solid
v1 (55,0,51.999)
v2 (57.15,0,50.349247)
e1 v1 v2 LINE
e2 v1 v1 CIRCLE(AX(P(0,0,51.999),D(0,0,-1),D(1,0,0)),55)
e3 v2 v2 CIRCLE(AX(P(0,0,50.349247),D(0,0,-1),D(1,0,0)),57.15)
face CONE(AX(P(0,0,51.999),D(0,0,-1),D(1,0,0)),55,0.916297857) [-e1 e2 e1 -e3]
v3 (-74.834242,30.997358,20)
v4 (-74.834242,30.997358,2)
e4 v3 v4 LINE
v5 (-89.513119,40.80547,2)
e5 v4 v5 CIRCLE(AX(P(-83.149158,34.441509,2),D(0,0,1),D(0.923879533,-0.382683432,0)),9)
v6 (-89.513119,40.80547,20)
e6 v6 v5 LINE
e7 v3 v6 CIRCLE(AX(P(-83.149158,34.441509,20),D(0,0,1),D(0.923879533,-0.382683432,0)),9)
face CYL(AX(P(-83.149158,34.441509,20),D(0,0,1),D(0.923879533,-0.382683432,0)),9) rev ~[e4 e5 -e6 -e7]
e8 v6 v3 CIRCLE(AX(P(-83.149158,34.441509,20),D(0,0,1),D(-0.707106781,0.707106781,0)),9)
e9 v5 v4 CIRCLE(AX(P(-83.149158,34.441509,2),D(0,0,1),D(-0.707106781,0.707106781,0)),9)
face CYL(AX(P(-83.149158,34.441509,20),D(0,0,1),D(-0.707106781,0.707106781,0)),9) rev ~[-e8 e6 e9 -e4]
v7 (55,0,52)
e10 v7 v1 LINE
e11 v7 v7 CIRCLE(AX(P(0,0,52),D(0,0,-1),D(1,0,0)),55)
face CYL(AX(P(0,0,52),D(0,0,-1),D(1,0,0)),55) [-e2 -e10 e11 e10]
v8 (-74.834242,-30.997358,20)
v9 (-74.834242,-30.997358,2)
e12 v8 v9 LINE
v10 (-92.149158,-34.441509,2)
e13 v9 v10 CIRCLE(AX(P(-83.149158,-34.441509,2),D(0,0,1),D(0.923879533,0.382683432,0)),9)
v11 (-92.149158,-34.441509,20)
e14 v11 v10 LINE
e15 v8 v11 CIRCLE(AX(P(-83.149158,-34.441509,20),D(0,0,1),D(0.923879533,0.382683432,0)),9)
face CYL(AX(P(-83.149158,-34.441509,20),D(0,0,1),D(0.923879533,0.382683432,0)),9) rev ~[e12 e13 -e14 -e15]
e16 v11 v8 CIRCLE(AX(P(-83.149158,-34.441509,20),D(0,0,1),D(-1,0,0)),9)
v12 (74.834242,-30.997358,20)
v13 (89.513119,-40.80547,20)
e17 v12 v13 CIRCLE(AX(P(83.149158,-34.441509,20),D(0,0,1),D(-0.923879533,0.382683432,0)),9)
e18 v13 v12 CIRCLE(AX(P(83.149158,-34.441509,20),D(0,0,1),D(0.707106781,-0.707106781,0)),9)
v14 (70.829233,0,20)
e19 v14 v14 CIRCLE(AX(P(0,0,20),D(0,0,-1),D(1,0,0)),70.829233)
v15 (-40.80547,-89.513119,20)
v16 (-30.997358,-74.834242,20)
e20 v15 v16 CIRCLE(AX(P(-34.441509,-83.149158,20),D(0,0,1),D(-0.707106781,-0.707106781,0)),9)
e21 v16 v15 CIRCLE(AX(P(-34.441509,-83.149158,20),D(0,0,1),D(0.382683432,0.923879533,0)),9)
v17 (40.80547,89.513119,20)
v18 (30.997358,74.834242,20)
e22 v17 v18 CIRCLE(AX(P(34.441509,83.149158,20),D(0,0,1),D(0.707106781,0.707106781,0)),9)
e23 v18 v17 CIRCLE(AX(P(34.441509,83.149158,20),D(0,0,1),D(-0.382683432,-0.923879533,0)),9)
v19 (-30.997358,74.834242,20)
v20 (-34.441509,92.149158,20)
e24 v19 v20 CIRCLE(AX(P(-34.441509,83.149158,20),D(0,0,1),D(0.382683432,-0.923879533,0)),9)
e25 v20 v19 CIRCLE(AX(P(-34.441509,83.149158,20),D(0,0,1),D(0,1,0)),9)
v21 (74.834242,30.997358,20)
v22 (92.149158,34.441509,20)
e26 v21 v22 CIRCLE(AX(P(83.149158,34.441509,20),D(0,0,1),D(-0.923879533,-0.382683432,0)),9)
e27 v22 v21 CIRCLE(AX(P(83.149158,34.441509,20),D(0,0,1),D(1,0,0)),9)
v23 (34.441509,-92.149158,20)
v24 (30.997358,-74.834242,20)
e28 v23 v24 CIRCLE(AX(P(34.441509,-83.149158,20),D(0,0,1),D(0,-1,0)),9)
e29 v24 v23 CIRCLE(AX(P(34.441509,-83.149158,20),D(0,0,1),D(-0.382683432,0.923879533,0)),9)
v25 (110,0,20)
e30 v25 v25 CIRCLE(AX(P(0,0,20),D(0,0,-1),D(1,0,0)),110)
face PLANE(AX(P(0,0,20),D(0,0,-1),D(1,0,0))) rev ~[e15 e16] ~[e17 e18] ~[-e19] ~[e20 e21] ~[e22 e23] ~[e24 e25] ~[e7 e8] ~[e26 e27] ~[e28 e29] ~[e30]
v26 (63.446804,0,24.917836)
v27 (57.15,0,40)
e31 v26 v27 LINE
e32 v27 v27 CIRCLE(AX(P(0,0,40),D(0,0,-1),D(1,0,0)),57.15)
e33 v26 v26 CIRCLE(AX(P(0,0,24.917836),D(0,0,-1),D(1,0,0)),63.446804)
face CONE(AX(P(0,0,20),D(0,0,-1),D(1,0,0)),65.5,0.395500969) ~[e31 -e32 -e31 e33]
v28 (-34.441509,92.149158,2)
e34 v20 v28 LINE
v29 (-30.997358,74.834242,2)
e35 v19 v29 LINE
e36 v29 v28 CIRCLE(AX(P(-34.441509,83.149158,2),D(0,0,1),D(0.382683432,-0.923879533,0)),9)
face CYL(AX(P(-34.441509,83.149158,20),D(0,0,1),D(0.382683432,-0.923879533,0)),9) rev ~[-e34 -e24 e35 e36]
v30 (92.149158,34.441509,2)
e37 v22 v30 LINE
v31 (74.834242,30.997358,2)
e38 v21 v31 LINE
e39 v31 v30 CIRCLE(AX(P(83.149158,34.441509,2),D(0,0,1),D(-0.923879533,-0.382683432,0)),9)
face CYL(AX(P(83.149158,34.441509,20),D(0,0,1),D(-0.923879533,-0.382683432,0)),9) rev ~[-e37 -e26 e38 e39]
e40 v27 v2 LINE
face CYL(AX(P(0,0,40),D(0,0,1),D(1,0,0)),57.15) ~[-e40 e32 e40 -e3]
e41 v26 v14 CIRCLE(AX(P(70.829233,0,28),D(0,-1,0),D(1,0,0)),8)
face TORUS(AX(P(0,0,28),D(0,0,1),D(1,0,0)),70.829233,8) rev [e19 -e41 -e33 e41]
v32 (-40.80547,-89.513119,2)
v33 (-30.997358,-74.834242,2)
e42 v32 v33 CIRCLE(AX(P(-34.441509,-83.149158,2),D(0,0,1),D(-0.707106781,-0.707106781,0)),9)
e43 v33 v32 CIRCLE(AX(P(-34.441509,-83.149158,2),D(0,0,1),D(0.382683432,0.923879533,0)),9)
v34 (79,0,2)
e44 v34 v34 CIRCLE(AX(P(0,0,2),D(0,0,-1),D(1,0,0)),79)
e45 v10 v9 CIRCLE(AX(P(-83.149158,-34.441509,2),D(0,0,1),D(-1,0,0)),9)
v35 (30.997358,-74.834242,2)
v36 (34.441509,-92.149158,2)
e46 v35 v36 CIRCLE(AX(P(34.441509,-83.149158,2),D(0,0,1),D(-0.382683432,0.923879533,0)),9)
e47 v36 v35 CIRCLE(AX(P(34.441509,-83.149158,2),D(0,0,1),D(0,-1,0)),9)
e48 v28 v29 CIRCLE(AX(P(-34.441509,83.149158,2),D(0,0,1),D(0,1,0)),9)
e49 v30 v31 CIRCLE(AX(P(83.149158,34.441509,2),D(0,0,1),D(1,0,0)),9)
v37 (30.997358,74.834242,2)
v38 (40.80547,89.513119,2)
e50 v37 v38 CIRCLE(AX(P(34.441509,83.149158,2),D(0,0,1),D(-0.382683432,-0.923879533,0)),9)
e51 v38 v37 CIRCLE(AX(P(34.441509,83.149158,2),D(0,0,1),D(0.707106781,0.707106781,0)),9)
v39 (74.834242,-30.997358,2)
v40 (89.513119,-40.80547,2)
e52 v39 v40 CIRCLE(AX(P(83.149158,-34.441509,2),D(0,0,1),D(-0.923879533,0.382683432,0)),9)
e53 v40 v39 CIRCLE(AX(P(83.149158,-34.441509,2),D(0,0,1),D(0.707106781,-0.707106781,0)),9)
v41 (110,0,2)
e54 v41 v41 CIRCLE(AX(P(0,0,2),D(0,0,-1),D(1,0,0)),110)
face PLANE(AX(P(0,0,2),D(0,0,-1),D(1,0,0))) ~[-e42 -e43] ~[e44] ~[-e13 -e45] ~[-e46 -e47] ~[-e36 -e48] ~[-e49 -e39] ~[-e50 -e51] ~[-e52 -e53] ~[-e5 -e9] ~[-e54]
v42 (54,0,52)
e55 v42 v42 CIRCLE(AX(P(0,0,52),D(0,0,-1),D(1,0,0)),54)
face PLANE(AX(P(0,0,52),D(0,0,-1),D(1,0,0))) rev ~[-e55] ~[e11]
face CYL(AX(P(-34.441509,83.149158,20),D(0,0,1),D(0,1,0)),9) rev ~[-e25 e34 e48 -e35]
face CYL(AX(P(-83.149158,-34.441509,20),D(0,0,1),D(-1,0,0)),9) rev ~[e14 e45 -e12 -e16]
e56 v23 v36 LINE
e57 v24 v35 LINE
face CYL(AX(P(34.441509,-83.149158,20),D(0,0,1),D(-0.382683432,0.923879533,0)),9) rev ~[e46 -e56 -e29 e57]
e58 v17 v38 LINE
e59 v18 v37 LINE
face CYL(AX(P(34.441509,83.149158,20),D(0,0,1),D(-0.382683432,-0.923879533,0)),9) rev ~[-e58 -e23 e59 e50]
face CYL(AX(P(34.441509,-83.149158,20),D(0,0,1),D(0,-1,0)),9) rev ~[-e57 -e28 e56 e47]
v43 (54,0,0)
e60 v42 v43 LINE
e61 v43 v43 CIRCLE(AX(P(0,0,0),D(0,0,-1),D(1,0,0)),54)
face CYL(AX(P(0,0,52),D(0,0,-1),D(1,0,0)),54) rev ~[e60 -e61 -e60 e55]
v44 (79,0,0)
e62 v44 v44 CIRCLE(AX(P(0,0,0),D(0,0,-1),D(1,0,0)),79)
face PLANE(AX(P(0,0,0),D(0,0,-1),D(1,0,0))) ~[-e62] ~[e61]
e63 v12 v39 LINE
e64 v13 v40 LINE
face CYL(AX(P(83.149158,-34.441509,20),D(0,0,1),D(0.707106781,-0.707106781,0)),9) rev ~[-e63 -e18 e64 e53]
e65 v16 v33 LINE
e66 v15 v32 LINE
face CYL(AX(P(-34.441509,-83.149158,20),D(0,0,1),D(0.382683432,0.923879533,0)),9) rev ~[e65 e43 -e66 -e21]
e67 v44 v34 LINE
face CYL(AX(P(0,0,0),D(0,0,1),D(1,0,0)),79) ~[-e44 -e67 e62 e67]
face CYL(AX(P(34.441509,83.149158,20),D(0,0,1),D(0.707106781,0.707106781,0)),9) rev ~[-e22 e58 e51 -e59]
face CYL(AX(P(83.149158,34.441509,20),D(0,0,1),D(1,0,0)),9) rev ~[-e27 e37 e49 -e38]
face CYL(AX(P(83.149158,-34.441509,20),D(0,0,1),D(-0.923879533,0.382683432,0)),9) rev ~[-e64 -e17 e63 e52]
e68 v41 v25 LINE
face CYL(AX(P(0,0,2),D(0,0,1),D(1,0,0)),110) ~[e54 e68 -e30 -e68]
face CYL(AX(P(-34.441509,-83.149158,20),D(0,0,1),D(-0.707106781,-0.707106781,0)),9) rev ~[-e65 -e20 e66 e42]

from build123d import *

# Parameters (mm, degrees)
F3_DEPTH        = 20.001
F3_COPIES_COUNT = 8
F6_R            = 8


# Not quite as in the source:
# - a pattern or mirror of a feature is missing from the dataset's text; its kind, count and spacing are read off the source's solid


with BuildPart() as f1:
    # F0 (on Front) → F1 (revolve)
    with BuildSketch(Plane.XZ):
        Polygon((54, 52), (54, 0), (79, 0), (79, 2), (110, 2), (110, 20), (65.5, 20), (57.15, 40), (57.15, 52), align=None)
    revolve(axis=Axis((0, 0, 26), (0, 0, -1)))

    # F2 (on face) → F3 (cut, through all)
    with BuildSketch(Plane.XY.offset(20)):
        with BuildLine():
            ThreePointArc((74.8342421334, 30.9973580216), (84.9049708242, 25.6144413892), (92.149157926, 34.4415089129))
            ThreePointArc((92.149157926, 34.4415089129), (81.3933450279, 43.2685764365), (74.8342421334, 30.9973580216))
        make_face()
    f3 = extrude(amount=-F3_DEPTH, mode=Mode.SUBTRACT)

    # F3_copies: F3 ×8 about axis
    f3_copies_axis = Axis((0, 0, 0), (0, 0, 1))
    for i in range(1, F3_COPIES_COUNT):
        add(f3.rotate(f3_copies_axis, i * 360 / F3_COPIES_COUNT), mode=Mode.SUBTRACT)

    # F4 (on Front) → F5 (revolve, cut)
    with BuildSketch(Plane.XZ):
        Polygon((57.15, 52), (55, 52), (55, 51.999), (57.15, 50.3492469758), align=None)
    revolve(axis=Axis((0, 0, 26), (0, 0, -1)), mode=Mode.SUBTRACT)

    # F6
    f6_edges = [f1.edges().sort_by_distance(p)[0] for p in [
        (-65.5, 0, 20),
    ]]
    fillet(f6_edges, radius=F6_R)


solid = f1.part
